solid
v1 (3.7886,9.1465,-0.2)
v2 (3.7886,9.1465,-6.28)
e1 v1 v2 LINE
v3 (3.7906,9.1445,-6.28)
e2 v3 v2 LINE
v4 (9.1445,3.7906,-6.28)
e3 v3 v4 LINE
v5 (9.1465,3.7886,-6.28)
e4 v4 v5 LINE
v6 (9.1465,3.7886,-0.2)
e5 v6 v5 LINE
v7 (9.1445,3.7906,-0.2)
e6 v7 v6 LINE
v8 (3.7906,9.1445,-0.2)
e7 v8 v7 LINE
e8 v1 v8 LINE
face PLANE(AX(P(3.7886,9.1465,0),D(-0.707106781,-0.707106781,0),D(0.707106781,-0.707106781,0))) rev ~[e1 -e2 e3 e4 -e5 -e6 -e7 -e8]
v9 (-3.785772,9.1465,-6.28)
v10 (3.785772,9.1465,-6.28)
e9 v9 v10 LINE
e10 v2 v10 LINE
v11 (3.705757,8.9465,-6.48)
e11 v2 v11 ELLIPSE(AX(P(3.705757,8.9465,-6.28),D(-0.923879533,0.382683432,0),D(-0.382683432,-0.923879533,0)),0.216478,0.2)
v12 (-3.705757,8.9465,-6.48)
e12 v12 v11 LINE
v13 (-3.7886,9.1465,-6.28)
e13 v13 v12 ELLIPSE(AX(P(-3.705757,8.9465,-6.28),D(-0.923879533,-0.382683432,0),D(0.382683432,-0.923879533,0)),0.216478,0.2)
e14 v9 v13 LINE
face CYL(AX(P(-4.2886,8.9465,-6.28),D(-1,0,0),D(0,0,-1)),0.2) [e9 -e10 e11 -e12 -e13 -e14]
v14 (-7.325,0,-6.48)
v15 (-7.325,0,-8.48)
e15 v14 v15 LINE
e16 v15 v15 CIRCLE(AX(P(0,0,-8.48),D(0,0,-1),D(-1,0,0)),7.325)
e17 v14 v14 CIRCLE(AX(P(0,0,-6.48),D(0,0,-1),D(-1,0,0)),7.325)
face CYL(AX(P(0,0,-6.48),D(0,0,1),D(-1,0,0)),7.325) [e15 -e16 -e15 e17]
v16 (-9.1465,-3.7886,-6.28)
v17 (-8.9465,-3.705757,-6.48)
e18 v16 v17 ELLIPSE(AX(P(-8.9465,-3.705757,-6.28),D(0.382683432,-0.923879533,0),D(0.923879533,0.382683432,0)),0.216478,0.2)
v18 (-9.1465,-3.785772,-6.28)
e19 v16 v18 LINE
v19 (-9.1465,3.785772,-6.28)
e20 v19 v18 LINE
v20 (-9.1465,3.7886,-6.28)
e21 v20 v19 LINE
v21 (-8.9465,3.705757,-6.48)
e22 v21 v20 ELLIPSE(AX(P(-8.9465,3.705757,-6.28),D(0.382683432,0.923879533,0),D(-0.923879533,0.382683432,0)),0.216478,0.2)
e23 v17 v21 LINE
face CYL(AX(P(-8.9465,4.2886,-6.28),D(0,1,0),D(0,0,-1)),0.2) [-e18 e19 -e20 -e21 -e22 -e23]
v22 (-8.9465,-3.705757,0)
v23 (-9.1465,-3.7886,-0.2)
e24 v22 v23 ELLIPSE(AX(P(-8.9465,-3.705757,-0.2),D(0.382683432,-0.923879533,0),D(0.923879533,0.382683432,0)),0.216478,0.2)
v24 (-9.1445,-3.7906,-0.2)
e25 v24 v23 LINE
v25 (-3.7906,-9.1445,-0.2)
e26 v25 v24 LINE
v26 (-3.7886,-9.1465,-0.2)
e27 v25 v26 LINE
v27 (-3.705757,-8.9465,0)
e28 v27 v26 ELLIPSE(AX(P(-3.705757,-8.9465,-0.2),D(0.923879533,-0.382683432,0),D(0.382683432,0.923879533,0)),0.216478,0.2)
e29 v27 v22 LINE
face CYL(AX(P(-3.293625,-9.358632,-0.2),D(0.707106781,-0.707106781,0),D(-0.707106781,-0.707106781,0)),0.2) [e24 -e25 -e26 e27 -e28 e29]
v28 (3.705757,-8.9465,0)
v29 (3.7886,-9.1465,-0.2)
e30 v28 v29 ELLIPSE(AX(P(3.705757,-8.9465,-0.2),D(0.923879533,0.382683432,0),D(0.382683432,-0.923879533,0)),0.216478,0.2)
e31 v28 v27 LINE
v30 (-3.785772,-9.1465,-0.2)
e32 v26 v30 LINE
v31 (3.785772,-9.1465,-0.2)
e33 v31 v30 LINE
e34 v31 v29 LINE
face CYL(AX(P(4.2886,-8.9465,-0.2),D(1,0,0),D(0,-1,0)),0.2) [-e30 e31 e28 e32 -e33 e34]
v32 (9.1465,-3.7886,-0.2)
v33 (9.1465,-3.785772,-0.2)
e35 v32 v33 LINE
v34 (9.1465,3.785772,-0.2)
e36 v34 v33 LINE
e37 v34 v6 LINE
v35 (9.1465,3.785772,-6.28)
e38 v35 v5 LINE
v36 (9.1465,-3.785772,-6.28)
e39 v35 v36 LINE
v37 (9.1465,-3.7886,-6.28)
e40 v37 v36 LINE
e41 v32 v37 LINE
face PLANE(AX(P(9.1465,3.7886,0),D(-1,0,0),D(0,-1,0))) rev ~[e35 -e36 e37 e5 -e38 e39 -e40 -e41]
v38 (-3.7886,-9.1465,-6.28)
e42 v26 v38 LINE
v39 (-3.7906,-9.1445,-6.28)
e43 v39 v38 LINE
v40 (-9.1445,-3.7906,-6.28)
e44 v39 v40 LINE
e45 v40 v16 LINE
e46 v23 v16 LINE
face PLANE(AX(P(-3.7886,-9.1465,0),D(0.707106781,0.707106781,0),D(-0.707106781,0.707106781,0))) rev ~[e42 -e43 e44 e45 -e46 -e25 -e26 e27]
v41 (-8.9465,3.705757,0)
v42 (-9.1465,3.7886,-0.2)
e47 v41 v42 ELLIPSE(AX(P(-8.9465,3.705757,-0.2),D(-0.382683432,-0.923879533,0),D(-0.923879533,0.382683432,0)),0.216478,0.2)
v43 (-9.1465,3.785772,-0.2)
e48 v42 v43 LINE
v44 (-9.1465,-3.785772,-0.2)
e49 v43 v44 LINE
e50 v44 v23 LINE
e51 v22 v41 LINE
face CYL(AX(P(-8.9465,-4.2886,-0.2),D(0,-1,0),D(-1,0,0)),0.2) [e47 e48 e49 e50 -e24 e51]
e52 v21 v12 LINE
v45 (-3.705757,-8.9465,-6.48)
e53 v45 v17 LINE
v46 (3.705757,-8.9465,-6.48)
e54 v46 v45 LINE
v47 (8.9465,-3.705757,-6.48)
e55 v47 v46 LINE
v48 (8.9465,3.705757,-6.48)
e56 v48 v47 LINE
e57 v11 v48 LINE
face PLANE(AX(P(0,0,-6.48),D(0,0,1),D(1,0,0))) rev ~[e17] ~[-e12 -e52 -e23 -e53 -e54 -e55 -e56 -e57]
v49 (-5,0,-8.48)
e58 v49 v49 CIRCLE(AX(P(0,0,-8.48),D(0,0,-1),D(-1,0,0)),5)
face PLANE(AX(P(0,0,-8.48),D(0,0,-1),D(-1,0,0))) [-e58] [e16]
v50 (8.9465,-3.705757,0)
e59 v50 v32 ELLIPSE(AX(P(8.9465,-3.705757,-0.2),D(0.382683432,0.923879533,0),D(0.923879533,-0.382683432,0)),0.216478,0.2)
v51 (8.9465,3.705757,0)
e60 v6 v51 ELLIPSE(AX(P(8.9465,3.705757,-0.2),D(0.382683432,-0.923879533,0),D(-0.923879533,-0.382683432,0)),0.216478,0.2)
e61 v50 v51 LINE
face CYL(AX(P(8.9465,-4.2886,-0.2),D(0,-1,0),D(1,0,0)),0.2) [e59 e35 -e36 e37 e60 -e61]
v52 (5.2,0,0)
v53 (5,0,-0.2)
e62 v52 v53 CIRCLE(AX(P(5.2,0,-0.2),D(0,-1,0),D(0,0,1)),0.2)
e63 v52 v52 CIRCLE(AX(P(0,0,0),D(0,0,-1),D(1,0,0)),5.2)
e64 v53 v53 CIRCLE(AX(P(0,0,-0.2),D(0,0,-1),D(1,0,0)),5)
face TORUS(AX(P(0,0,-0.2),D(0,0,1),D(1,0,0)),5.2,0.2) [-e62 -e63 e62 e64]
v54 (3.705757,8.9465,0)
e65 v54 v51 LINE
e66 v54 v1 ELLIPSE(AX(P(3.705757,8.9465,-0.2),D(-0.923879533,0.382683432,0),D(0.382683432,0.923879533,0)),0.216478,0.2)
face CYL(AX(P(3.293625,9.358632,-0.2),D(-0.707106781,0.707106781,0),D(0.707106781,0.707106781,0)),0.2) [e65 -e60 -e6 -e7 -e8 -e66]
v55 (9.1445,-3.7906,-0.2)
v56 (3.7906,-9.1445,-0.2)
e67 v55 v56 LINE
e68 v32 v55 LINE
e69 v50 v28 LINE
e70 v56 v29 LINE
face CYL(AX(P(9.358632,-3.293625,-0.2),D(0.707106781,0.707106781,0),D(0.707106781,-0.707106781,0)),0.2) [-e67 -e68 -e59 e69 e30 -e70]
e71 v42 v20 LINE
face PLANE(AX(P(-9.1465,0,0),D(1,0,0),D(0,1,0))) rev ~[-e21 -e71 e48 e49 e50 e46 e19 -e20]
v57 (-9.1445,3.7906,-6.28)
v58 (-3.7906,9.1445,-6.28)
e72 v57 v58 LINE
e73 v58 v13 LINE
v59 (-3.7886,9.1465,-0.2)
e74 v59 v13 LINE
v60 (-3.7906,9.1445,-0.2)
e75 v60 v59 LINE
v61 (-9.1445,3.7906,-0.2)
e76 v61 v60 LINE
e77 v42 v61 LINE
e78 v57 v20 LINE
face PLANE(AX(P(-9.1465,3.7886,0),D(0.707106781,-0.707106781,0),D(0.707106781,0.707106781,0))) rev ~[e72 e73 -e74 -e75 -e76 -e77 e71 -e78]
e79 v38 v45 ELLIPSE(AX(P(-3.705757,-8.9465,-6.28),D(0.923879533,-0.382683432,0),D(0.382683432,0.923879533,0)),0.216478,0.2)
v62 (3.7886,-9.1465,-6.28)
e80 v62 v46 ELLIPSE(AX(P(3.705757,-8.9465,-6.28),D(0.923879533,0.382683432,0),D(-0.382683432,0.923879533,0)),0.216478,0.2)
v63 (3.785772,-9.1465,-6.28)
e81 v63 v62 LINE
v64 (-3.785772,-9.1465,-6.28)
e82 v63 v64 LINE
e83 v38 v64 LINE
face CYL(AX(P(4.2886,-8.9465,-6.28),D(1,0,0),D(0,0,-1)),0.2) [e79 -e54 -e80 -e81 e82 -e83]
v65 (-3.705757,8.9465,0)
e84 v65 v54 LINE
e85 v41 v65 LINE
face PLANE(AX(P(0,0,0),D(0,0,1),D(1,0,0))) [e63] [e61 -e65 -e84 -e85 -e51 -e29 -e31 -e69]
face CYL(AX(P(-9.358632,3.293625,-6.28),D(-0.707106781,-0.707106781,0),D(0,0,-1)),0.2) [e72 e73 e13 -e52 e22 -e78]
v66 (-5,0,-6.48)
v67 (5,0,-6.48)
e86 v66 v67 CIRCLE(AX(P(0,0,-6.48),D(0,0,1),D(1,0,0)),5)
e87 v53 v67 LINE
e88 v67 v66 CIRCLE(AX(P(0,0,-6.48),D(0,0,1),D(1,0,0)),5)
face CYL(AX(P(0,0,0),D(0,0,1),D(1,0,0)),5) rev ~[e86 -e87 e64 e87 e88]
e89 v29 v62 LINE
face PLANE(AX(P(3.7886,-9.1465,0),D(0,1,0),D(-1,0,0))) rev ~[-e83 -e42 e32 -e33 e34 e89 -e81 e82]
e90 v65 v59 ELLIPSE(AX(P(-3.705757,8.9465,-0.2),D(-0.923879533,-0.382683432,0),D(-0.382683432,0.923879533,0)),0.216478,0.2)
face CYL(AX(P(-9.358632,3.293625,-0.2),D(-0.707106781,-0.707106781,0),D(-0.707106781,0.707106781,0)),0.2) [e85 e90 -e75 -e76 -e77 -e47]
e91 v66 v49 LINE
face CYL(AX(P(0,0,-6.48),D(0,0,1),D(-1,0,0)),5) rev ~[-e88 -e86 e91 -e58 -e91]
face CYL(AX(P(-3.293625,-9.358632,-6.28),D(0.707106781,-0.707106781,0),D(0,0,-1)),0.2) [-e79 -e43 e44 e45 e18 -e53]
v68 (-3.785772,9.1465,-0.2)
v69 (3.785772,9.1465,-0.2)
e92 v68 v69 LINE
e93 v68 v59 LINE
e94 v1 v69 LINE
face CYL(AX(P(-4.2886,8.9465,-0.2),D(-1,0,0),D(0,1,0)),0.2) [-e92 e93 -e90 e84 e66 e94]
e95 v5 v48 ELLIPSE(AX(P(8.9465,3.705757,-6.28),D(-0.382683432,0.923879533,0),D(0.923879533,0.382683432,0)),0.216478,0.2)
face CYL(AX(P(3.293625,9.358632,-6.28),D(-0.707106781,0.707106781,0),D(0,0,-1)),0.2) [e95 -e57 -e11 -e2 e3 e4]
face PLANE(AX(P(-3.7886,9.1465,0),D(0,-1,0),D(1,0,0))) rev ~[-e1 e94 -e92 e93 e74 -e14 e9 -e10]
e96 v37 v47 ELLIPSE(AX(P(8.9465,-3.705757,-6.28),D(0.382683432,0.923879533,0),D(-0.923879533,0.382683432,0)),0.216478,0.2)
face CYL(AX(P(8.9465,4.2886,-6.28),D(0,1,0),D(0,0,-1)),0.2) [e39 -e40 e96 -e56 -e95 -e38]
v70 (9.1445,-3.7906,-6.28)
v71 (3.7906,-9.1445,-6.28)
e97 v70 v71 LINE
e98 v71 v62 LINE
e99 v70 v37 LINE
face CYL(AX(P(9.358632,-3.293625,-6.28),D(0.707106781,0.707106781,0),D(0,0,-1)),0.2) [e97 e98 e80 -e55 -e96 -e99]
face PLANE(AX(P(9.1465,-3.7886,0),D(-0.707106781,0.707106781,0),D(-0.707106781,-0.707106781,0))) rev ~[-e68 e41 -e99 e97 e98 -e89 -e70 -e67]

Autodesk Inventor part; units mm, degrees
ref_plane "YZ Plane" through (0, 0, 0) normal (1, 0, 0) x (0, 1, 0)
ref_plane "XZ Plane" through (0, 0, 0) normal (0, 1, 0) x (-1, 0, 0)
ref_plane "XY Plane" through (0, 0, 0) normal (0, 0, 1) x (1, 0, 0)
sketch "Sketch1" plane through (0, 0, 0) normal (0, 0, 1) x (1, 0, 0)
  line L0 (-12.8051, 0) -> (12.8051, 0) projected
  line L1 (9.1465, -3.7886) -> (3.7886, -9.1465)
  line L2 (3.7886, -9.1465) -> (-3.7886, -9.1465)
  line L3 (-3.7886, -9.1465) -> (-9.1465, -3.7886)
  line L4 (-9.1465, -3.7886) -> (-9.1465, 3.7886)
  line L5 (-9.1465, 3.7886) -> (-3.7886, 9.1465)
  line L6 (-3.7886, 9.1465) -> (3.7886, 9.1465)
  line L7 (3.7886, 9.1465) -> (9.1465, 3.7886)
  line L8 (9.1465, 3.7886) -> (9.1465, -3.7886)
  circle A0 centre (0, 0) radius 5
  point P0 (9.1465, 0)
  dimension "d0" = 18.293
  dimension "d1" = 10
extrude "Extrusion1" add sketch "Sketch1" against normal blind 6.48 contours L4 L5 L6 L7 L8 L0 A0 | L0 A0 L8 L1 L2 L3 L4
sketch "Sketch2" plane through (0, 0, -6.48) normal (0, 0, -1) x (-1, 0, 0)
  circle A0 centre (0, 0) radius 5 projected
  circle A1 centre (0, 0) radius 7.325
  dimension "d4" = 14.65
extrude "Extrusion2" add sketch "Sketch2" along normal blind 2
fillet "Fillet1" radius 0.2 17 edges at (0, -9.1465, 0) (-6.4676, -6.4676, 0) (6.4676, -6.4676, 0) (9.1465, 0, 0) (6.4676, 6.4676, 0) (0, 9.1465, 0) (-6.4676, 6.4676, 0) (-9.1465, 0, 0) (9.1465, 0, -6.48) (6.4676, -6.4676, -6.48) (0, -9.1465, -6.48) (-6.4676, -6.4676, -6.48) (-9.1465, 0, -6.48) (-6.4676, 6.4676, -6.48) (0, 9.1465, -6.48) (6.4676, 6.4676, -6.48) (-5, 0, 0)
thread "Thread1" size "M10x1.5" class "6H" standard "ANSI Metric M Profile" full length
properties part number "201-11" material "Steel"
